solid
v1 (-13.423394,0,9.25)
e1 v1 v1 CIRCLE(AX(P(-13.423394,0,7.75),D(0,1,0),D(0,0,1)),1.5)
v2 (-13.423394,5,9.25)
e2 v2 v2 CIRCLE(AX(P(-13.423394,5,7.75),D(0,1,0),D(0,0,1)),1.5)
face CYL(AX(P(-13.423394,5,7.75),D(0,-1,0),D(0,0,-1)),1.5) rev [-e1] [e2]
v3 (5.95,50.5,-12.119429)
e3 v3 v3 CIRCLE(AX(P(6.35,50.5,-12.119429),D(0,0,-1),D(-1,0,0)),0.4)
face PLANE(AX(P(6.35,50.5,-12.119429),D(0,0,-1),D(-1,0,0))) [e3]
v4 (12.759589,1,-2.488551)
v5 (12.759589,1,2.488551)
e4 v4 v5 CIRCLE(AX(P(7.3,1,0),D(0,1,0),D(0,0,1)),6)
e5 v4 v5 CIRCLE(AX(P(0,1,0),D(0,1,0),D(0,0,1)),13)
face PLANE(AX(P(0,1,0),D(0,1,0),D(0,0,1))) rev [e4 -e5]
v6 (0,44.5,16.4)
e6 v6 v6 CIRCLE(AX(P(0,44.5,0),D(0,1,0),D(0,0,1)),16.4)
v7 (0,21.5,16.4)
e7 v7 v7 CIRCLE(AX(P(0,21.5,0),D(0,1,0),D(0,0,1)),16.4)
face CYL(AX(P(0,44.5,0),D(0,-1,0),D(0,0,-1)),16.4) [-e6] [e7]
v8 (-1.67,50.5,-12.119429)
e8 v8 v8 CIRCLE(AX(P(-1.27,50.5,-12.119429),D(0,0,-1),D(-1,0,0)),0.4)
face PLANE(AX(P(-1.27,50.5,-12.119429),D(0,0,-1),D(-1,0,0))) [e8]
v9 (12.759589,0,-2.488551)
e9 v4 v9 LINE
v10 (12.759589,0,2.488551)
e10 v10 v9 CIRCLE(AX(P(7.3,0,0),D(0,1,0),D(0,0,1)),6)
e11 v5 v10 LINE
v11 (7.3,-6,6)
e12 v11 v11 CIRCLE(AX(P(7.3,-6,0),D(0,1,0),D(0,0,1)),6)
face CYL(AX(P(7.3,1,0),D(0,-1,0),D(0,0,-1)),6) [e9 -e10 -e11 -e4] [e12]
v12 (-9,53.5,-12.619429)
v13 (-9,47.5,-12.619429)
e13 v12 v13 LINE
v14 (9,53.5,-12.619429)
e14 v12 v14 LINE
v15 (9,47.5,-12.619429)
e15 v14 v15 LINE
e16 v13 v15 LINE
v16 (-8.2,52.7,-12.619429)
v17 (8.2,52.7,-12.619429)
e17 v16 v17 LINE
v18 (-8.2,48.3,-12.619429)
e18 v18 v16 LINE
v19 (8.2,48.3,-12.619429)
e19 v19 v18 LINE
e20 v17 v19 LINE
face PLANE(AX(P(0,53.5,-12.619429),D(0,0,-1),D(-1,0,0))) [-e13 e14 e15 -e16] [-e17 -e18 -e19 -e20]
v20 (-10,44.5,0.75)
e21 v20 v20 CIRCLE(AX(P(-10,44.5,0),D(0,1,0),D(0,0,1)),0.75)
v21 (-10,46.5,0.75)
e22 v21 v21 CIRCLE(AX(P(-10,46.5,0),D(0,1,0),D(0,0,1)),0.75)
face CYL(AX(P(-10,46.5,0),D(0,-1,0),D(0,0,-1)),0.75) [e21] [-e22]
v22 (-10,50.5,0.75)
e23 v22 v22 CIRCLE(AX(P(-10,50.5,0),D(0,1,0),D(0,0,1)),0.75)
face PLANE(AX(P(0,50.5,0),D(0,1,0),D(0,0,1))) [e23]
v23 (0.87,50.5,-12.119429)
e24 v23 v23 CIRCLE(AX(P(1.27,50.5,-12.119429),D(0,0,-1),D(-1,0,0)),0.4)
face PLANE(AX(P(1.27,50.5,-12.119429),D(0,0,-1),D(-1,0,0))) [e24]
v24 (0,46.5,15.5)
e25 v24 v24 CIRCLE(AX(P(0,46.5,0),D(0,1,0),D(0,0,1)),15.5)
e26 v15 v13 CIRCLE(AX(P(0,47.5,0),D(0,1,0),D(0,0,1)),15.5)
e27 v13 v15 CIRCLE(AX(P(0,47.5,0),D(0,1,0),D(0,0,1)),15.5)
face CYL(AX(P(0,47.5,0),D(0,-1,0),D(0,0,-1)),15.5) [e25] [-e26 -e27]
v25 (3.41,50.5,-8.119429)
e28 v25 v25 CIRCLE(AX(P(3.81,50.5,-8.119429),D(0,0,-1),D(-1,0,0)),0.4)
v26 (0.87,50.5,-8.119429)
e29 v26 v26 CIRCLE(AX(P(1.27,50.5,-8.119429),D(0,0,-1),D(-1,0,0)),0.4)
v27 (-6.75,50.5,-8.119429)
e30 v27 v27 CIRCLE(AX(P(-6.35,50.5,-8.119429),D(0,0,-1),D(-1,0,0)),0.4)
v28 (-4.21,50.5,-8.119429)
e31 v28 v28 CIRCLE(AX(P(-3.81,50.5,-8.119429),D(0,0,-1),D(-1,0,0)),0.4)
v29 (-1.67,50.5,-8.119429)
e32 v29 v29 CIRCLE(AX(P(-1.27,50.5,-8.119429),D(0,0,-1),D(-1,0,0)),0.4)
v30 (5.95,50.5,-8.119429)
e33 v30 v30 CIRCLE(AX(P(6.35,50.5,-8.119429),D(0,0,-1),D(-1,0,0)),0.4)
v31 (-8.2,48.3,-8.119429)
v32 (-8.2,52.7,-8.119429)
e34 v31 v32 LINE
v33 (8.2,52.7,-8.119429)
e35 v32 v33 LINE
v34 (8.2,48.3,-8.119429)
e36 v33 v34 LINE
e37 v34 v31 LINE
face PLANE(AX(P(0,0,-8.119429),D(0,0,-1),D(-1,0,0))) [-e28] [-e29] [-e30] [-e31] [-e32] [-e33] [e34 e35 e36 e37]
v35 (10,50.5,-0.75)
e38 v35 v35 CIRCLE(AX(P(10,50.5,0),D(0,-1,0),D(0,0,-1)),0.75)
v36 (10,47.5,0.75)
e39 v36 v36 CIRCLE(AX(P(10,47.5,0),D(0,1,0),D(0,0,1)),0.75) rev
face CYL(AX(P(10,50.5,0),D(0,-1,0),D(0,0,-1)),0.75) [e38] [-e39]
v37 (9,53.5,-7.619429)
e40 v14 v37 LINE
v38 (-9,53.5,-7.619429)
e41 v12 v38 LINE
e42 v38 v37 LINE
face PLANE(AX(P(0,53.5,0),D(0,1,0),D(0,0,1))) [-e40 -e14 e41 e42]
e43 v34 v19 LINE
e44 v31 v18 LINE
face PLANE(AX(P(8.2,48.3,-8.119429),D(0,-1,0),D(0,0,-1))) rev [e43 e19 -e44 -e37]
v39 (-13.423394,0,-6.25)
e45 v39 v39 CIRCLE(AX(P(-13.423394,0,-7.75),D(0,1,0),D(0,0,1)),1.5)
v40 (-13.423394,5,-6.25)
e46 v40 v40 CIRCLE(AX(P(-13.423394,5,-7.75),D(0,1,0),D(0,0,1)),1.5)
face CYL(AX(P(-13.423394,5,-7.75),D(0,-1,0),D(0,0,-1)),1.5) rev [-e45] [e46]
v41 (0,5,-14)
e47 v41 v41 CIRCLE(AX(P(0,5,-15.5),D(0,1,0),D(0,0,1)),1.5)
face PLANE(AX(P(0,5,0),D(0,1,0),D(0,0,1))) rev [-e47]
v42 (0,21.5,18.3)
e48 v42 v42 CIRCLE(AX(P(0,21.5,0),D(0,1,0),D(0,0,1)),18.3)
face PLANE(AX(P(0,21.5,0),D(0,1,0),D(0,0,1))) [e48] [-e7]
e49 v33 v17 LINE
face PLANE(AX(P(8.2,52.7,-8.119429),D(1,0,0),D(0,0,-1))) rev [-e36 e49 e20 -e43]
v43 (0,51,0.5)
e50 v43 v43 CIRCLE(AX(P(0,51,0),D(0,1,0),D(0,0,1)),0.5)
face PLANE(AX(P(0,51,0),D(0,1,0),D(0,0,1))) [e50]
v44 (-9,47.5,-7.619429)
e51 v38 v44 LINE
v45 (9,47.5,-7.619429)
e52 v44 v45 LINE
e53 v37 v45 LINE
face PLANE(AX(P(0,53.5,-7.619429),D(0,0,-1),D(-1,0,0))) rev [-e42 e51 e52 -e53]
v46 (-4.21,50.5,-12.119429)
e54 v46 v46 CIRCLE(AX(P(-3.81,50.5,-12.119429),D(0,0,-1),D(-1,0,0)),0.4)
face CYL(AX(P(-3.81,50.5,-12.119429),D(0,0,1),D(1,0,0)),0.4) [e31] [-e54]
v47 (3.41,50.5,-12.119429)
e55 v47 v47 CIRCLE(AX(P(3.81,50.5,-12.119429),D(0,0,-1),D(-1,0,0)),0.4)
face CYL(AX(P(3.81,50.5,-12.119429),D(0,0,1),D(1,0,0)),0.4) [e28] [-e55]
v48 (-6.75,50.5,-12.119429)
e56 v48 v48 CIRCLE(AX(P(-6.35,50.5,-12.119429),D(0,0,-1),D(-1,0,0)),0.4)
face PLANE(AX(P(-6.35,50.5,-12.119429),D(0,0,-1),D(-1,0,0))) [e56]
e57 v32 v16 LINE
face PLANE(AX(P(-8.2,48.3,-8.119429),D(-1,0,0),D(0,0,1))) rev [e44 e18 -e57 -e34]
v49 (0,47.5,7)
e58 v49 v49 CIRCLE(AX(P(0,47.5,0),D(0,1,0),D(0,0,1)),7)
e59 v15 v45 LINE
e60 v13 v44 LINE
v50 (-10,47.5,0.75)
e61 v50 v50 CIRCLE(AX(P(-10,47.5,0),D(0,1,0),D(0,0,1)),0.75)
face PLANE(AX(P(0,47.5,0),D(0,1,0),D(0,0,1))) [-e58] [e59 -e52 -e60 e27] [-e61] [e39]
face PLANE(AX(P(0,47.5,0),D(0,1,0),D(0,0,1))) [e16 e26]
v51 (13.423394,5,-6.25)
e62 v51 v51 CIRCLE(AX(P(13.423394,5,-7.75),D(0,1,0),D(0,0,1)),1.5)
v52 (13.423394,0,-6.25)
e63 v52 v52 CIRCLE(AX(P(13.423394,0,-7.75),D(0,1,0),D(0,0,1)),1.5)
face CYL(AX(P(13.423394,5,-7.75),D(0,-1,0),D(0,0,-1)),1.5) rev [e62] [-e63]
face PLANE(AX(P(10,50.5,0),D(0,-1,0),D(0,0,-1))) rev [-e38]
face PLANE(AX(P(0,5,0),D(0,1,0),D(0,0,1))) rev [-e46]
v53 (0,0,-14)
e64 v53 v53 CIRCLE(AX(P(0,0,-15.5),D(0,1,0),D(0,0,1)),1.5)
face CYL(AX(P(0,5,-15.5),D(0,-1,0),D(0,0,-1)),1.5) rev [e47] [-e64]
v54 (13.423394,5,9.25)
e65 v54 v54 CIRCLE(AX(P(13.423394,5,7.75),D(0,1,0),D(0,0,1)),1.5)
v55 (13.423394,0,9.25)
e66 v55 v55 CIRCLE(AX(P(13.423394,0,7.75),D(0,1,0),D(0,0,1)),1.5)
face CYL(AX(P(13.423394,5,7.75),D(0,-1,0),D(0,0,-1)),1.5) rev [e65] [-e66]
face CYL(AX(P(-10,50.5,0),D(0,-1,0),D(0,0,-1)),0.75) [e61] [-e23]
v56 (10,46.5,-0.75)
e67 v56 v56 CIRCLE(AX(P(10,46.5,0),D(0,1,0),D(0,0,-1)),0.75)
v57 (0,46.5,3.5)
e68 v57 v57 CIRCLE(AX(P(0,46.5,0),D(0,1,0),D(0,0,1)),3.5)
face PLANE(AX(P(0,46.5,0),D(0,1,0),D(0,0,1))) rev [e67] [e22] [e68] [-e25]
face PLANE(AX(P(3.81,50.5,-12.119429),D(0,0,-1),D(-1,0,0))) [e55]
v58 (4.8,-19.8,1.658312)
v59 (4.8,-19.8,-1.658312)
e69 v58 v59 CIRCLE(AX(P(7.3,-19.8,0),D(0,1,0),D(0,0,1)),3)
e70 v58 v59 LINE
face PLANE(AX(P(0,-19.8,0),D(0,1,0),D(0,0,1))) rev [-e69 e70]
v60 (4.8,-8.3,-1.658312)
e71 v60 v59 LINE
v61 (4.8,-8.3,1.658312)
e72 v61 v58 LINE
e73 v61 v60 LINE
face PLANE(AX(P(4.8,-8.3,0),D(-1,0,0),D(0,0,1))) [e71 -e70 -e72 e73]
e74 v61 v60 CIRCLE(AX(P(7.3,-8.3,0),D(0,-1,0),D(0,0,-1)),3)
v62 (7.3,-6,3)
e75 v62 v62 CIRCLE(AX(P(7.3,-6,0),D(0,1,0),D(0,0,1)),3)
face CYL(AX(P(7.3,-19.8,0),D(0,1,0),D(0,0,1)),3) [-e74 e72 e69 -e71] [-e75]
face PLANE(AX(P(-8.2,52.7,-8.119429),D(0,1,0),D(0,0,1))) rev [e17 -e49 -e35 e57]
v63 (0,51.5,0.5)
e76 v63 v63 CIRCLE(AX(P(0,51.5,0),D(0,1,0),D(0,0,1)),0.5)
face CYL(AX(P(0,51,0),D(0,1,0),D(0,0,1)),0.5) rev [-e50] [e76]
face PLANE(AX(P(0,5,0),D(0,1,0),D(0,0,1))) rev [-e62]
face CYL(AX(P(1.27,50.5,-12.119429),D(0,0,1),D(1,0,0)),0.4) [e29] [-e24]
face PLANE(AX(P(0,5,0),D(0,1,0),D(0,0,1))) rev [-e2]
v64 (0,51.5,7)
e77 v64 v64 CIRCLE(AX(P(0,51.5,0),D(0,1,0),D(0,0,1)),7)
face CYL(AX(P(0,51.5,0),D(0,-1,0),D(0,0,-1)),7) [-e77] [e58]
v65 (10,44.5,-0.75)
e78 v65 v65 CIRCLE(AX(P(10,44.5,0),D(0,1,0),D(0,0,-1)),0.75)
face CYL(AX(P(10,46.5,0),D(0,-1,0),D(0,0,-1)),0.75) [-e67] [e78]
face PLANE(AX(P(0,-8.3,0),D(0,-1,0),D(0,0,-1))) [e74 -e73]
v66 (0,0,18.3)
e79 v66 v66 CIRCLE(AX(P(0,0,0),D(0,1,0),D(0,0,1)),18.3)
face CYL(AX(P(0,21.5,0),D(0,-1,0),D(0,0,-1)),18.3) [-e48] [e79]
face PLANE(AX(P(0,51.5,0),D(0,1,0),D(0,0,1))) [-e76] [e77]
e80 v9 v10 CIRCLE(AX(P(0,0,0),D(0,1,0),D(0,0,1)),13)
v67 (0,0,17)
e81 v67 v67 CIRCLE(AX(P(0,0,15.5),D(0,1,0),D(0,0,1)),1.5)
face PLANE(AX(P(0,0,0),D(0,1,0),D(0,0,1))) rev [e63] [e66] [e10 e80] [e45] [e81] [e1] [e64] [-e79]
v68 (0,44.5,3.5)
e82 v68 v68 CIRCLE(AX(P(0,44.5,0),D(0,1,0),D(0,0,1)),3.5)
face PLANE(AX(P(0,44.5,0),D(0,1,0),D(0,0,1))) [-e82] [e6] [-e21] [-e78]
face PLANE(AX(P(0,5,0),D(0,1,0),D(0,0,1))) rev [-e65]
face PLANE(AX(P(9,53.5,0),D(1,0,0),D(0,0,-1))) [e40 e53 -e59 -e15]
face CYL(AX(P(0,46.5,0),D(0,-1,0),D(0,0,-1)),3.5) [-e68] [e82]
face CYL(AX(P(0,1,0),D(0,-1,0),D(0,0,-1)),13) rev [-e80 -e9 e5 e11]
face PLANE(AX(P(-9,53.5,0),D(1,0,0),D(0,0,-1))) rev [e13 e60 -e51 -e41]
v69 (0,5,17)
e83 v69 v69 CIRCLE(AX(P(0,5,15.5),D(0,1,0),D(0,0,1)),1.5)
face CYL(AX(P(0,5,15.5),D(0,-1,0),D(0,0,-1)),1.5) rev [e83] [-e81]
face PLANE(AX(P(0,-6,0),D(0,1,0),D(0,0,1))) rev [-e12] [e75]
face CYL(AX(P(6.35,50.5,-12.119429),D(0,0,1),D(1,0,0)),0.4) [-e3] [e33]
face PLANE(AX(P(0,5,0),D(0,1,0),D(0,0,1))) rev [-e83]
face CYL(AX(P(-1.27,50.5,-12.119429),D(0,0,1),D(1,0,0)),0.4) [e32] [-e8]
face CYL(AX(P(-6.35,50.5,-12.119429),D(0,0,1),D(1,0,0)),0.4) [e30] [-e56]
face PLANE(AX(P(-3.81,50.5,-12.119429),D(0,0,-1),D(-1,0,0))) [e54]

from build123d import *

# Parameters (mm, degrees)
SKETCH_1_R                 = 18.3
SKETCH_1_R_2               = 13
SKETCH_1_R_3               = 6
SKETCH_1_R_4               = 1.5
SKETCH_1_R_5               = 3
EXTRUDE_2_DEPTH            = 21.5
CUT_EXTRUDE_8_DEPTH        = 1
SKETCH_1_10_R              = 1.5
CUT_EXTRUDE_9_DEPTH        = 5
EXTRUDE_START              = -6
SKETCH_1_11_R              = 6
SKETCH_1_11_R_2            = 3
EXTRUDE_3_DEPTH            = 6
EXTRUDE_START_2            = -19.8
SKETCH_1_12_R              = 3
EXTRUDE_4_DEPTH            = 19.8
CUT_EXTRUDE_10_DEPTH       = 11.5
SKETCH_4_R                 = 16.4
EXTRUDE_5_DEPTH            = 23
SKETCH_5_R                 = 0.75
EXTRUDE_6_DEPTH            = 6
SKETCH_5_3_R               = 15.5
SKETCH_5_3_R_2             = 0.75
SKETCH_5_3_R_3             = 3.5
EXTRUDE_7_DEPTH            = 3
CUT_EXTRUDE_11_OUTLINE_R   = 15.5
CUT_EXTRUDE_11_OUTLINE_R_2 = 0.75
CUT_EXTRUDE_11_OUTLINE_R_3 = 3.5
CUT_EXTRUDE_11_DEPTH       = 2
SKETCH_6_R                 = 7
EXTRUDE_8_DEPTH            = 4
SKETCH_6_3_W               = 16
SKETCH_6_3_H               = 4
EXTRUDE_9_DEPTH            = 6
SKETCH_7_R                 = 0.5
CUT_EXTRUDE_12_DEPTH       = 0.5
SKETCH_8_W                 = 16.4
SKETCH_8_H                 = 4.4
CUT_EXTRUDE_13_DEPTH       = 4.5
SKETCH_9_R                 = 0.4
EXTRUDE_10_DEPTH           = 4


# Read off the part's stored shape, not the designer's step: 切除-拉伸11
with BuildPart() as part:
    # 草图1 → 凸台-拉伸2 (new body)
    # profile 1 of 15: a face of its own
    with BuildSketch(Plane(origin=(0, 0, 0), x_dir=(1, 0, 0), z_dir=(0, 1, 0))):
        with Locations(Location((0, 0, 0), (0, 0, 270))):
            Circle(SKETCH_1_R)
        Circle(SKETCH_1_R_2, mode=Mode.SUBTRACT)
        with Locations((7.3, 0)):
            Circle(SKETCH_1_R_3, mode=Mode.SUBTRACT)
        with Locations((-13.423393759, 7.75)):
            Circle(SKETCH_1_R_4, mode=Mode.SUBTRACT)
        with Locations((-13.423393759, -7.75)):
            Circle(SKETCH_1_R_4, mode=Mode.SUBTRACT)
        with Locations((0, -15.5)):
            Circle(SKETCH_1_R_4, mode=Mode.SUBTRACT)
        with Locations((13.423393759, -7.75)):
            Circle(SKETCH_1_R_4, mode=Mode.SUBTRACT)
        with Locations((13.423393759, 7.75)):
            Circle(SKETCH_1_R_4, mode=Mode.SUBTRACT)
        with Locations((0, 15.5)):
            Circle(SKETCH_1_R_4, mode=Mode.SUBTRACT)
    # profile 2 of 15: a face of its own
    with BuildSketch(Plane(origin=(0, 0, 0), x_dir=(1, 0, 0), z_dir=(0, 1, 0))):
        Circle(SKETCH_1_R_2)
    # profile 3 of 15: a face of its own
    with BuildSketch(Plane(origin=(0, 0, 0), x_dir=(1, 0, 0), z_dir=(0, 1, 0))):
        with Locations((7.3, 0)):
            Circle(SKETCH_1_R_3)
    # profile 4 of 15: a face of its own
    with BuildSketch(Plane(origin=(0, 0, 0), x_dir=(1, 0, 0), z_dir=(0, 1, 0))):
        with Locations((0, 15.5)):
            Circle(SKETCH_1_R_4)
    # profile 5 of 15: a face of its own
    with BuildSketch(Plane(origin=(0, 0, 0), x_dir=(1, 0, 0), z_dir=(0, 1, 0))):
        with Locations((-13.423393759, 7.75)):
            Circle(SKETCH_1_R_4)
    # profile 6 of 15: a face of its own
    with BuildSketch(Plane(origin=(0, 0, 0), x_dir=(1, 0, 0), z_dir=(0, 1, 0))):
        with Locations((-13.423393759, -7.75)):
            Circle(SKETCH_1_R_4)
    # profile 7 of 15: a face of its own
    with BuildSketch(Plane(origin=(0, 0, 0), x_dir=(1, 0, 0), z_dir=(0, 1, 0))):
        with Locations((0, -15.5)):
            Circle(SKETCH_1_R_4)
    # profile 8 of 15: a face of its own
    with BuildSketch(Plane(origin=(0, 0, 0), x_dir=(1, 0, 0), z_dir=(0, 1, 0))):
        with Locations((13.423393759, -7.75)):
            Circle(SKETCH_1_R_4)
    # profile 9 of 15: a face of its own
    with BuildSketch(Plane(origin=(0, 0, 0), x_dir=(1, 0, 0), z_dir=(0, 1, 0))):
        with Locations((13.423393759, 7.75)):
            Circle(SKETCH_1_R_4)
    # profile 10 of 15: a face of its own
    with BuildSketch(Plane(origin=(0, 0, 0), x_dir=(1, 0, 0), z_dir=(0, 1, 0))):
        with Locations((7.3, 0)):
            Circle(SKETCH_1_R_5)
    # profile 11 of 15: a face of its own
    with BuildSketch(Plane(origin=(0, 0, 0), x_dir=(1, 0, 0), z_dir=(0, 1, 0))):
        with Locations((7.3, 0)):
            Circle(SKETCH_1_R_3)
    # profile 12 of 15: a face of its own
    with BuildSketch(Plane(origin=(0, 0, 0), x_dir=(1, 0, 0), z_dir=(0, 1, 0))):
        Circle(SKETCH_1_R_2)
    # profile 13 of 15: a face of its own
    with BuildSketch(Plane(origin=(0, 0, 0), x_dir=(1, 0, 0), z_dir=(0, 1, 0))):
        with Locations((7.3, 0)):
            Circle(SKETCH_1_R_5)
    # profile 14 of 15: a face of its own
    with BuildSketch(Plane(origin=(0, 0, 0), x_dir=(1, 0, 0), z_dir=(0, 1, 0))):
        Circle(SKETCH_1_R_2)
    # profile 15 of 15: a face of its own
    with BuildSketch(Plane(origin=(0, 0, 0), x_dir=(1, 0, 0), z_dir=(0, 1, 0))):
        with Locations((7.3, 0)):
            Circle(SKETCH_1_R_3)
    extrude(amount=EXTRUDE_2_DEPTH)

    # 草图1<9> → 切除-拉伸8 (cut)
    with BuildSketch(Plane(origin=(0, 0, 0), x_dir=(1, 0, 0), z_dir=(0, 1, 0))):
        with BuildLine():
            ThreePointArc((12.759589041, -2.488551286), (1.3, 0), (12.759589041, 2.488551286))
            ThreePointArc((12.759589041, 2.488551286), (-13, 0), (12.759589041, -2.488551286))
        make_face()
    extrude(amount=CUT_EXTRUDE_8_DEPTH, mode=Mode.SUBTRACT)

    # 草图1<10> → 切除-拉伸9 (cut)
    with BuildSketch(Plane(origin=(0, 0, 0), x_dir=(1, 0, 0), z_dir=(0, 1, 0))):
        with Locations(Location((13.423393759, 7.75, 0), (0, 0, 270))):
            Circle(SKETCH_1_10_R)
        with Locations(Location((0, 15.5, 0), (0, 0, 270))):
            Circle(SKETCH_1_10_R)
        with Locations(Location((-13.423393759, 7.75, 0), (0, 0, 270))):
            Circle(SKETCH_1_10_R)
        with Locations(Location((-13.423393759, -7.75, 0), (0, 0, 270))):
            Circle(SKETCH_1_10_R)
        with Locations(Location((0, -15.5, 0), (0, 0, 270))):
            Circle(SKETCH_1_10_R)
        with Locations(Location((13.423393759, -7.75, 0), (0, 0, 270))):
            Circle(SKETCH_1_10_R)
    extrude(amount=CUT_EXTRUDE_9_DEPTH, mode=Mode.SUBTRACT)

    # 草图1<11> → 凸台-拉伸3 (add)
    with BuildSketch(Plane(origin=(0, 0, 0), x_dir=(1, 0, 0), z_dir=(0, 1, 0)).offset(EXTRUDE_START)):
        with Locations(Location((7.3, 0, 0), (0, 0, 24.504112001))):
            Circle(SKETCH_1_11_R)
        with Locations(Location((7.3, 0, 0), (0, 0, 270))):
            Circle(SKETCH_1_11_R_2, mode=Mode.SUBTRACT)
    extrude(amount=EXTRUDE_3_DEPTH)

    # 草图1<12> → 凸台-拉伸4 (add)
    with BuildSketch(Plane(origin=(0, 0, 0), x_dir=(1, 0, 0), z_dir=(0, 1, 0)).offset(EXTRUDE_START_2)):
        with Locations(Location((7.3, 0, 0), (0, 0, 270))):
            Circle(SKETCH_1_12_R)
    extrude(amount=EXTRUDE_4_DEPTH)

    # 草图3 → 切除-拉伸10 (cut)
    with BuildSketch(Plane.XZ.offset(19.8)):
        with BuildLine():
            Line((4.8, -1.658312395), (4.8, 1.658312395))
            ThreePointArc((4.8, 1.658312395), (4.3, 0), (4.8, -1.658312395))
        make_face()
    extrude(amount=-CUT_EXTRUDE_10_DEPTH, mode=Mode.SUBTRACT)

    # 草图4 → 凸台-拉伸5 (add)
    with BuildSketch(Plane(origin=(0, 21.5, 0), x_dir=(1, 0, 0), z_dir=(0, 1, 0))):
        with Locations(Location((0, 0, 0), (0, 0, 270))):
            Circle(SKETCH_4_R)
    extrude(amount=EXTRUDE_5_DEPTH)

    # 草图5 → 凸台-拉伸6 (add)
    with BuildSketch(Plane(origin=(0, 44.5, 0), x_dir=(1, 0, 0), z_dir=(0, 1, 0))):
        with Locations(Location((-10, 0, 0), (0, 0, 270))):
            Circle(SKETCH_5_R)
        with Locations(Location((10, 0, 0), (0, 0, 90))):
            Circle(SKETCH_5_R)
    extrude(amount=EXTRUDE_6_DEPTH)

    # 草图5<3> → 凸台-拉伸7 (add)
    # profile 1 of 2: a face of its own
    with BuildSketch(Plane(origin=(0, 44.5, 0), x_dir=(1, 0, 0), z_dir=(0, 1, 0))):
        with Locations(Location((0, 0, 0), (0, 0, 270))):
            Circle(SKETCH_5_3_R)
        with Locations(Location((10, 0, 0), (0, 0, 90))):
            Circle(SKETCH_5_3_R_2, mode=Mode.SUBTRACT)
        Circle(SKETCH_5_3_R_3, mode=Mode.SUBTRACT)
        with Locations(Location((-10, 0, 0), (0, 0, 270))):
            Circle(SKETCH_5_3_R_2, mode=Mode.SUBTRACT)
    # profile 2 of 2: a face of its own
    with BuildSketch(Plane(origin=(0, 44.5, 0), x_dir=(1, 0, 0), z_dir=(0, 1, 0))):
        Circle(SKETCH_5_3_R_3)
    extrude(amount=EXTRUDE_7_DEPTH)

    # 切除-拉伸11 outline → 切除-拉伸11 (cut)
    with BuildSketch(Plane(origin=(0, 44.5, 0), x_dir=(1, 0, 0), z_dir=(0, 1, 0))):
        Circle(CUT_EXTRUDE_11_OUTLINE_R)
        with Locations((-10, 0)):
            Circle(CUT_EXTRUDE_11_OUTLINE_R_2, mode=Mode.SUBTRACT)
        Circle(CUT_EXTRUDE_11_OUTLINE_R_3, mode=Mode.SUBTRACT)
        with Locations((10, 0)):
            Circle(CUT_EXTRUDE_11_OUTLINE_R_2, mode=Mode.SUBTRACT)
    extrude(amount=CUT_EXTRUDE_11_DEPTH, mode=Mode.SUBTRACT)

    # 草图6 → 凸台-拉伸8 (add)
    with BuildSketch(Plane(origin=(0, 47.5, 0), x_dir=(1, 0, 0), z_dir=(0, 1, 0))):
        with Locations(Location((0, 0, 0), (0, 0, 270))):
            Circle(SKETCH_6_R)
    extrude(amount=EXTRUDE_8_DEPTH)

    # 草图6<3> → 凸台-拉伸9 (add)
    with BuildSketch(Plane(origin=(0, 47.5, 0), x_dir=(1, 0, 0), z_dir=(0, 1, 0))):
        with Locations((0, 10.619429464)):
            Rectangle(SKETCH_6_3_W, SKETCH_6_3_H)
        Polygon((-8, 12.619429464), (-9, 12.619429464), (-9, 7.619429464), (9, 7.619429464), (9, 12.619429464), (8, 12.619429464), (8, 8.619429464), (-8, 8.619429464), align=None)
    extrude(amount=EXTRUDE_9_DEPTH)

    # 草图7 → 切除-拉伸12 (cut)
    with BuildSketch(Plane(origin=(0, 51.5, 0), x_dir=(1, 0, 0), z_dir=(0, 1, 0))):
        with Locations(Location((0, 0, 0), (0, 0, 270))):
            Circle(SKETCH_7_R)
    extrude(amount=-CUT_EXTRUDE_12_DEPTH, mode=Mode.SUBTRACT)

    # 草图8 → 切除-拉伸13 (cut)
    with BuildSketch(Plane(origin=(0, 0, -12.619429464), x_dir=(-1, 0, 0), z_dir=(0, 0, -1))):
        with Locations((0, 50.5)):
            Rectangle(SKETCH_8_W, SKETCH_8_H)
    extrude(amount=-CUT_EXTRUDE_13_DEPTH, mode=Mode.SUBTRACT)

    # 草图9 → 凸台-拉伸10 (add)
    with BuildSketch(Plane(origin=(0, 0, -8.119429464), x_dir=(-1, 0, 0), z_dir=(0, 0, -1))):
        with Locations((-6.35, 50.5)):
            Circle(SKETCH_9_R)
        with Locations((-3.81, 50.5)):
            Circle(SKETCH_9_R)
        with Locations((-1.27, 50.5)):
            Circle(SKETCH_9_R)
        with Locations((1.27, 50.5)):
            Circle(SKETCH_9_R)
        with Locations((3.81, 50.5)):
            Circle(SKETCH_9_R)
        with Locations((6.35, 50.5)):
            Circle(SKETCH_9_R)
    extrude(amount=EXTRUDE_10_DEPTH)


solid = part.part
